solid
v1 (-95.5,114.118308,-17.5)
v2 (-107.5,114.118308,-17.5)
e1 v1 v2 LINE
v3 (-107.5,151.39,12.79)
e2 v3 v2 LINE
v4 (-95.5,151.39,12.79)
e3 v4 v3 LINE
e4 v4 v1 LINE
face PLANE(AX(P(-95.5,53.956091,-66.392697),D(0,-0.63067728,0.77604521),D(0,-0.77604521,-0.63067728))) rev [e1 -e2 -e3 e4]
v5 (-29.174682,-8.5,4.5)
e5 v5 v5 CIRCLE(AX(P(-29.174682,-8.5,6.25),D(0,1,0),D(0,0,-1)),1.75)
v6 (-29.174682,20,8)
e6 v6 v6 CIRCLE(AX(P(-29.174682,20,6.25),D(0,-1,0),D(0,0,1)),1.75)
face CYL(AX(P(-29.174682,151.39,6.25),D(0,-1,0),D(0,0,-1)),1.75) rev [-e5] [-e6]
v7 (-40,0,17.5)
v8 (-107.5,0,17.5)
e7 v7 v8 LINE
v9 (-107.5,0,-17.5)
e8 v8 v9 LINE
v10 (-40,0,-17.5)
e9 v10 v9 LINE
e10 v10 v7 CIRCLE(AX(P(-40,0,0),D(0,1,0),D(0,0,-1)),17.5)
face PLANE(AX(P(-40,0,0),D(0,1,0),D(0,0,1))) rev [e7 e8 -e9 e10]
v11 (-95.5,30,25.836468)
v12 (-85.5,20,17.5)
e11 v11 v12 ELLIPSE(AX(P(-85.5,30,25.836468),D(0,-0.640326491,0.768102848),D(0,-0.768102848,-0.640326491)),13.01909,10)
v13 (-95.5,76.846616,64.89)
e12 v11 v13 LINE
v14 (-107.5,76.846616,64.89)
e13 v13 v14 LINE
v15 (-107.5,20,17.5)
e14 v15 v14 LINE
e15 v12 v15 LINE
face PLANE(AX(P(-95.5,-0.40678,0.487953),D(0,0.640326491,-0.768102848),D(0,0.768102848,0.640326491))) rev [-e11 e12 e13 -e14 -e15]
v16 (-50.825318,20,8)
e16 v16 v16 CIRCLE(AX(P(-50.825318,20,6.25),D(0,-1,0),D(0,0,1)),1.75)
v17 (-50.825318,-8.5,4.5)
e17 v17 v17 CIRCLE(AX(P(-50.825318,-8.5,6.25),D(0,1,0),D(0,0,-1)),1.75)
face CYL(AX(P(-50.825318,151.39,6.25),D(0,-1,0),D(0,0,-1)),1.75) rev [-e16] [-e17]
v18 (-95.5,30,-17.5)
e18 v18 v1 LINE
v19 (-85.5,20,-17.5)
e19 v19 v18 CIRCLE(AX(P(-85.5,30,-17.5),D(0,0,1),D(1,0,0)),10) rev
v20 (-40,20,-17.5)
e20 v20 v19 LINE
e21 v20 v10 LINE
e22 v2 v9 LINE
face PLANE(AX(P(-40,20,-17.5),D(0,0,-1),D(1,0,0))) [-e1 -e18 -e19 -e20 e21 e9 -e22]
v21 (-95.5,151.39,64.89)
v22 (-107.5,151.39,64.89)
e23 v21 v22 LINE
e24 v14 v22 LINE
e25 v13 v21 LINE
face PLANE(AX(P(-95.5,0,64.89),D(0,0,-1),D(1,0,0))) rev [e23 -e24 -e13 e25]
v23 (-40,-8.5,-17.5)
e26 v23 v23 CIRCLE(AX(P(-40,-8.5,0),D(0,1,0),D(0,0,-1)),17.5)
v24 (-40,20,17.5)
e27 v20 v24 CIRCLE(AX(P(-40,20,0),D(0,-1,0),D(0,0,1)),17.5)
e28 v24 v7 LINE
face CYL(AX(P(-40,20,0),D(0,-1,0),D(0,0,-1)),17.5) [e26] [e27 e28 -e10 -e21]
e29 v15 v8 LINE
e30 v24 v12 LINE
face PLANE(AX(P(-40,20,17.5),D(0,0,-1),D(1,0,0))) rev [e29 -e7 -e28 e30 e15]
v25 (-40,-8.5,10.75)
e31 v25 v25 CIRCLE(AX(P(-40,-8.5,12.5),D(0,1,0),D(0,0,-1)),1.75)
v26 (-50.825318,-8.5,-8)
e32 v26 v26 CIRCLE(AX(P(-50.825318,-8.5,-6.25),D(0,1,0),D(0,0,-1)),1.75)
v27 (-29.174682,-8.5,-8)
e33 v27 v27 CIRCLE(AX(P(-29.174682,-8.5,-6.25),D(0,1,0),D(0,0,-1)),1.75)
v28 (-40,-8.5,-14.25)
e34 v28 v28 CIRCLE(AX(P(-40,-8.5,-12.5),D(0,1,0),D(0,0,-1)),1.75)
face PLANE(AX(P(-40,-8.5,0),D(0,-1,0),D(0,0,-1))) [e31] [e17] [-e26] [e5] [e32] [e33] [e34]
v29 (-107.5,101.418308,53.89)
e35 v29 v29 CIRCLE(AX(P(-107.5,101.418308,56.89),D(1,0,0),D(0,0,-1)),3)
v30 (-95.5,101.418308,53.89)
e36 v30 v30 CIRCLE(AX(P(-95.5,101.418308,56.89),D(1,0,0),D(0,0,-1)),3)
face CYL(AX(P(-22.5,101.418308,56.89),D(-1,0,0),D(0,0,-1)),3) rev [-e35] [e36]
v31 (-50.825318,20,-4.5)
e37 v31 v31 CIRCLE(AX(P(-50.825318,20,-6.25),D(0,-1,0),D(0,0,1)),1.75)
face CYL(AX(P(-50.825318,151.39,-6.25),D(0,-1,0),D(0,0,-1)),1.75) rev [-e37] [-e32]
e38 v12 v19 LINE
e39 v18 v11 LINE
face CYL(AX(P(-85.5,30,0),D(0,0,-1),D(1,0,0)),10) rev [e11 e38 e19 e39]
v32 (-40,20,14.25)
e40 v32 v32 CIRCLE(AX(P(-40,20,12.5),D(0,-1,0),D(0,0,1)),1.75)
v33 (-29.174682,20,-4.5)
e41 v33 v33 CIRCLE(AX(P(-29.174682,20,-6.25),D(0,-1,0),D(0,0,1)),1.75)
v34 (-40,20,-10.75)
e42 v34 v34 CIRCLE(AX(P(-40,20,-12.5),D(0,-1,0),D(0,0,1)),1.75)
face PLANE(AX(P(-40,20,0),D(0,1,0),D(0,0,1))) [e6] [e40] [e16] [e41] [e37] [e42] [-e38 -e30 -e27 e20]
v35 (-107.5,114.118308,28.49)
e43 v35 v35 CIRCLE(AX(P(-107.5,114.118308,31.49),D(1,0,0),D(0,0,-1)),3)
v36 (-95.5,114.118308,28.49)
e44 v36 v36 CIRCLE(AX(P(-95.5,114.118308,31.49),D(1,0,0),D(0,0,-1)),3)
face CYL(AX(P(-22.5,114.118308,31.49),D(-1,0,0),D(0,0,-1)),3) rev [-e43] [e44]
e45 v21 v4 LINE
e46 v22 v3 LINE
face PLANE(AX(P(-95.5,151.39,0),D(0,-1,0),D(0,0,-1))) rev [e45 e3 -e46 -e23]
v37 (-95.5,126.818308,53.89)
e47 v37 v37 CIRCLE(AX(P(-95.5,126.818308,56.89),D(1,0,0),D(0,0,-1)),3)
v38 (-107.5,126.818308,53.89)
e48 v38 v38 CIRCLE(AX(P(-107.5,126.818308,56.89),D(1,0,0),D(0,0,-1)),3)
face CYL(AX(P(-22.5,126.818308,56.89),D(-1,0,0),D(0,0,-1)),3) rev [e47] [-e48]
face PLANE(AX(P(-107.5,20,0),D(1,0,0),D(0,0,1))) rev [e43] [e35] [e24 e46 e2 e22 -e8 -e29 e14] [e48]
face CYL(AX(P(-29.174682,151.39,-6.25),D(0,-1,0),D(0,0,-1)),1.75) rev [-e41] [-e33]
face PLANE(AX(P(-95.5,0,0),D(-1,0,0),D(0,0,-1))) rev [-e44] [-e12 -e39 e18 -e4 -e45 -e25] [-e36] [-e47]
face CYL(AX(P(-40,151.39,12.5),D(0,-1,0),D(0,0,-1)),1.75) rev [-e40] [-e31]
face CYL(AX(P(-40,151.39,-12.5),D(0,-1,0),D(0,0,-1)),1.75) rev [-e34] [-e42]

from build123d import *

# Parameters (mm, degrees)
BOSS_EXTRUDE1_DEPTH = 20
BOSS_EXTRUDE2_START = 8.5
SKETCH2_R           = 17.5
BOSS_EXTRUDE2_DEPTH = 8.5
BOSS_EXTRUDE3_DEPTH = 12
SKETCH4_R           = 3
CUT_EXTRUDE1_DEPTH  = 186.350058538
SKETCH5_R           = 1.75
CUT_EXTRUDE2_DEPTH  = 186.288354194
FILLET1_R           = 10


with BuildPart() as part:
    # Sketch1 → Boss-Extrude1 (new body)
    with BuildSketch(Plane(origin=(0, 0, 0), x_dir=(1, 0, 0), z_dir=(0, 1, 0))):
        with BuildLine():
            Line((67.5, 17.5), (0, 17.5))
            ThreePointArc((0, 17.5), (-17.5, 0), (0, -17.5))
            Line((0, -17.5), (67.5, -17.5))
            Line((67.5, -17.5), (67.5, 17.5))
        make_face()
    extrude(amount=BOSS_EXTRUDE1_DEPTH)

    # Sketch2 → Boss-Extrude2 (add)
    with BuildSketch(Plane.XZ.offset(BOSS_EXTRUDE2_START)):
        Circle(SKETCH2_R)
    extrude(amount=-BOSS_EXTRUDE2_DEPTH)

    # Sketch3 → Boss-Extrude3 (add)
    with BuildSketch(Plane(origin=(67.5, 0, 0), x_dir=(0, 0, -1), z_dir=(1, 0, 0))):
        Polygon((-17.5, 0), (17.5, 0), (17.5, 114.118307847), (-12.79, 151.39), (-64.89, 151.39), (-64.89, 76.846615693), (-57.39, 67.85), (-17.5, 20), align=None)
    extrude(amount=-BOSS_EXTRUDE3_DEPTH)

    # Sketch4 → Cut-Extrude1 (cut, through all)
    with BuildSketch(Plane(origin=(67.5, 0, 0), x_dir=(0, 0, -1), z_dir=(1, 0, 0))):
        with Locations((-56.89, 101.418307847)):
            Circle(SKETCH4_R)
        with Locations((-56.89, 126.818307847)):
            Circle(SKETCH4_R)
        with Locations((-31.49, 114.118307847)):
            Circle(SKETCH4_R)
    extrude(amount=-CUT_EXTRUDE1_DEPTH, mode=Mode.SUBTRACT)

    # Sketch5 → Cut-Extrude2 (cut, through all)
    with BuildSketch(Plane.XZ.offset(8.5)):
        with Locations((0, 12.5)):
            Circle(SKETCH5_R)
        with Locations((10.825317547, 6.25)):
            Circle(SKETCH5_R)
        with Locations((10.825317547, -6.25)):
            Circle(SKETCH5_R)
        with Locations((0, -12.5)):
            Circle(SKETCH5_R)
        with Locations((-10.825317547, -6.25)):
            Circle(SKETCH5_R)
        with Locations((-10.825317547, 6.25)):
            Circle(SKETCH5_R)
    extrude(amount=-CUT_EXTRUDE2_DEPTH, mode=Mode.SUBTRACT)

    # Fillet1
    fillet1_edges = [part.edges().sort_by_distance(p)[0] for p in [
        (55.5, 20, 0),
    ]]
    fillet(fillet1_edges, radius=FILLET1_R)


with BuildPart() as body_2:
    # Mirror1: mirrored copy
    add(part.part.mirror(Plane(origin=(-20, 0, 0), x_dir=(0, 0, 1), z_dir=(1, 0, 0))))


solid = body_2.part
